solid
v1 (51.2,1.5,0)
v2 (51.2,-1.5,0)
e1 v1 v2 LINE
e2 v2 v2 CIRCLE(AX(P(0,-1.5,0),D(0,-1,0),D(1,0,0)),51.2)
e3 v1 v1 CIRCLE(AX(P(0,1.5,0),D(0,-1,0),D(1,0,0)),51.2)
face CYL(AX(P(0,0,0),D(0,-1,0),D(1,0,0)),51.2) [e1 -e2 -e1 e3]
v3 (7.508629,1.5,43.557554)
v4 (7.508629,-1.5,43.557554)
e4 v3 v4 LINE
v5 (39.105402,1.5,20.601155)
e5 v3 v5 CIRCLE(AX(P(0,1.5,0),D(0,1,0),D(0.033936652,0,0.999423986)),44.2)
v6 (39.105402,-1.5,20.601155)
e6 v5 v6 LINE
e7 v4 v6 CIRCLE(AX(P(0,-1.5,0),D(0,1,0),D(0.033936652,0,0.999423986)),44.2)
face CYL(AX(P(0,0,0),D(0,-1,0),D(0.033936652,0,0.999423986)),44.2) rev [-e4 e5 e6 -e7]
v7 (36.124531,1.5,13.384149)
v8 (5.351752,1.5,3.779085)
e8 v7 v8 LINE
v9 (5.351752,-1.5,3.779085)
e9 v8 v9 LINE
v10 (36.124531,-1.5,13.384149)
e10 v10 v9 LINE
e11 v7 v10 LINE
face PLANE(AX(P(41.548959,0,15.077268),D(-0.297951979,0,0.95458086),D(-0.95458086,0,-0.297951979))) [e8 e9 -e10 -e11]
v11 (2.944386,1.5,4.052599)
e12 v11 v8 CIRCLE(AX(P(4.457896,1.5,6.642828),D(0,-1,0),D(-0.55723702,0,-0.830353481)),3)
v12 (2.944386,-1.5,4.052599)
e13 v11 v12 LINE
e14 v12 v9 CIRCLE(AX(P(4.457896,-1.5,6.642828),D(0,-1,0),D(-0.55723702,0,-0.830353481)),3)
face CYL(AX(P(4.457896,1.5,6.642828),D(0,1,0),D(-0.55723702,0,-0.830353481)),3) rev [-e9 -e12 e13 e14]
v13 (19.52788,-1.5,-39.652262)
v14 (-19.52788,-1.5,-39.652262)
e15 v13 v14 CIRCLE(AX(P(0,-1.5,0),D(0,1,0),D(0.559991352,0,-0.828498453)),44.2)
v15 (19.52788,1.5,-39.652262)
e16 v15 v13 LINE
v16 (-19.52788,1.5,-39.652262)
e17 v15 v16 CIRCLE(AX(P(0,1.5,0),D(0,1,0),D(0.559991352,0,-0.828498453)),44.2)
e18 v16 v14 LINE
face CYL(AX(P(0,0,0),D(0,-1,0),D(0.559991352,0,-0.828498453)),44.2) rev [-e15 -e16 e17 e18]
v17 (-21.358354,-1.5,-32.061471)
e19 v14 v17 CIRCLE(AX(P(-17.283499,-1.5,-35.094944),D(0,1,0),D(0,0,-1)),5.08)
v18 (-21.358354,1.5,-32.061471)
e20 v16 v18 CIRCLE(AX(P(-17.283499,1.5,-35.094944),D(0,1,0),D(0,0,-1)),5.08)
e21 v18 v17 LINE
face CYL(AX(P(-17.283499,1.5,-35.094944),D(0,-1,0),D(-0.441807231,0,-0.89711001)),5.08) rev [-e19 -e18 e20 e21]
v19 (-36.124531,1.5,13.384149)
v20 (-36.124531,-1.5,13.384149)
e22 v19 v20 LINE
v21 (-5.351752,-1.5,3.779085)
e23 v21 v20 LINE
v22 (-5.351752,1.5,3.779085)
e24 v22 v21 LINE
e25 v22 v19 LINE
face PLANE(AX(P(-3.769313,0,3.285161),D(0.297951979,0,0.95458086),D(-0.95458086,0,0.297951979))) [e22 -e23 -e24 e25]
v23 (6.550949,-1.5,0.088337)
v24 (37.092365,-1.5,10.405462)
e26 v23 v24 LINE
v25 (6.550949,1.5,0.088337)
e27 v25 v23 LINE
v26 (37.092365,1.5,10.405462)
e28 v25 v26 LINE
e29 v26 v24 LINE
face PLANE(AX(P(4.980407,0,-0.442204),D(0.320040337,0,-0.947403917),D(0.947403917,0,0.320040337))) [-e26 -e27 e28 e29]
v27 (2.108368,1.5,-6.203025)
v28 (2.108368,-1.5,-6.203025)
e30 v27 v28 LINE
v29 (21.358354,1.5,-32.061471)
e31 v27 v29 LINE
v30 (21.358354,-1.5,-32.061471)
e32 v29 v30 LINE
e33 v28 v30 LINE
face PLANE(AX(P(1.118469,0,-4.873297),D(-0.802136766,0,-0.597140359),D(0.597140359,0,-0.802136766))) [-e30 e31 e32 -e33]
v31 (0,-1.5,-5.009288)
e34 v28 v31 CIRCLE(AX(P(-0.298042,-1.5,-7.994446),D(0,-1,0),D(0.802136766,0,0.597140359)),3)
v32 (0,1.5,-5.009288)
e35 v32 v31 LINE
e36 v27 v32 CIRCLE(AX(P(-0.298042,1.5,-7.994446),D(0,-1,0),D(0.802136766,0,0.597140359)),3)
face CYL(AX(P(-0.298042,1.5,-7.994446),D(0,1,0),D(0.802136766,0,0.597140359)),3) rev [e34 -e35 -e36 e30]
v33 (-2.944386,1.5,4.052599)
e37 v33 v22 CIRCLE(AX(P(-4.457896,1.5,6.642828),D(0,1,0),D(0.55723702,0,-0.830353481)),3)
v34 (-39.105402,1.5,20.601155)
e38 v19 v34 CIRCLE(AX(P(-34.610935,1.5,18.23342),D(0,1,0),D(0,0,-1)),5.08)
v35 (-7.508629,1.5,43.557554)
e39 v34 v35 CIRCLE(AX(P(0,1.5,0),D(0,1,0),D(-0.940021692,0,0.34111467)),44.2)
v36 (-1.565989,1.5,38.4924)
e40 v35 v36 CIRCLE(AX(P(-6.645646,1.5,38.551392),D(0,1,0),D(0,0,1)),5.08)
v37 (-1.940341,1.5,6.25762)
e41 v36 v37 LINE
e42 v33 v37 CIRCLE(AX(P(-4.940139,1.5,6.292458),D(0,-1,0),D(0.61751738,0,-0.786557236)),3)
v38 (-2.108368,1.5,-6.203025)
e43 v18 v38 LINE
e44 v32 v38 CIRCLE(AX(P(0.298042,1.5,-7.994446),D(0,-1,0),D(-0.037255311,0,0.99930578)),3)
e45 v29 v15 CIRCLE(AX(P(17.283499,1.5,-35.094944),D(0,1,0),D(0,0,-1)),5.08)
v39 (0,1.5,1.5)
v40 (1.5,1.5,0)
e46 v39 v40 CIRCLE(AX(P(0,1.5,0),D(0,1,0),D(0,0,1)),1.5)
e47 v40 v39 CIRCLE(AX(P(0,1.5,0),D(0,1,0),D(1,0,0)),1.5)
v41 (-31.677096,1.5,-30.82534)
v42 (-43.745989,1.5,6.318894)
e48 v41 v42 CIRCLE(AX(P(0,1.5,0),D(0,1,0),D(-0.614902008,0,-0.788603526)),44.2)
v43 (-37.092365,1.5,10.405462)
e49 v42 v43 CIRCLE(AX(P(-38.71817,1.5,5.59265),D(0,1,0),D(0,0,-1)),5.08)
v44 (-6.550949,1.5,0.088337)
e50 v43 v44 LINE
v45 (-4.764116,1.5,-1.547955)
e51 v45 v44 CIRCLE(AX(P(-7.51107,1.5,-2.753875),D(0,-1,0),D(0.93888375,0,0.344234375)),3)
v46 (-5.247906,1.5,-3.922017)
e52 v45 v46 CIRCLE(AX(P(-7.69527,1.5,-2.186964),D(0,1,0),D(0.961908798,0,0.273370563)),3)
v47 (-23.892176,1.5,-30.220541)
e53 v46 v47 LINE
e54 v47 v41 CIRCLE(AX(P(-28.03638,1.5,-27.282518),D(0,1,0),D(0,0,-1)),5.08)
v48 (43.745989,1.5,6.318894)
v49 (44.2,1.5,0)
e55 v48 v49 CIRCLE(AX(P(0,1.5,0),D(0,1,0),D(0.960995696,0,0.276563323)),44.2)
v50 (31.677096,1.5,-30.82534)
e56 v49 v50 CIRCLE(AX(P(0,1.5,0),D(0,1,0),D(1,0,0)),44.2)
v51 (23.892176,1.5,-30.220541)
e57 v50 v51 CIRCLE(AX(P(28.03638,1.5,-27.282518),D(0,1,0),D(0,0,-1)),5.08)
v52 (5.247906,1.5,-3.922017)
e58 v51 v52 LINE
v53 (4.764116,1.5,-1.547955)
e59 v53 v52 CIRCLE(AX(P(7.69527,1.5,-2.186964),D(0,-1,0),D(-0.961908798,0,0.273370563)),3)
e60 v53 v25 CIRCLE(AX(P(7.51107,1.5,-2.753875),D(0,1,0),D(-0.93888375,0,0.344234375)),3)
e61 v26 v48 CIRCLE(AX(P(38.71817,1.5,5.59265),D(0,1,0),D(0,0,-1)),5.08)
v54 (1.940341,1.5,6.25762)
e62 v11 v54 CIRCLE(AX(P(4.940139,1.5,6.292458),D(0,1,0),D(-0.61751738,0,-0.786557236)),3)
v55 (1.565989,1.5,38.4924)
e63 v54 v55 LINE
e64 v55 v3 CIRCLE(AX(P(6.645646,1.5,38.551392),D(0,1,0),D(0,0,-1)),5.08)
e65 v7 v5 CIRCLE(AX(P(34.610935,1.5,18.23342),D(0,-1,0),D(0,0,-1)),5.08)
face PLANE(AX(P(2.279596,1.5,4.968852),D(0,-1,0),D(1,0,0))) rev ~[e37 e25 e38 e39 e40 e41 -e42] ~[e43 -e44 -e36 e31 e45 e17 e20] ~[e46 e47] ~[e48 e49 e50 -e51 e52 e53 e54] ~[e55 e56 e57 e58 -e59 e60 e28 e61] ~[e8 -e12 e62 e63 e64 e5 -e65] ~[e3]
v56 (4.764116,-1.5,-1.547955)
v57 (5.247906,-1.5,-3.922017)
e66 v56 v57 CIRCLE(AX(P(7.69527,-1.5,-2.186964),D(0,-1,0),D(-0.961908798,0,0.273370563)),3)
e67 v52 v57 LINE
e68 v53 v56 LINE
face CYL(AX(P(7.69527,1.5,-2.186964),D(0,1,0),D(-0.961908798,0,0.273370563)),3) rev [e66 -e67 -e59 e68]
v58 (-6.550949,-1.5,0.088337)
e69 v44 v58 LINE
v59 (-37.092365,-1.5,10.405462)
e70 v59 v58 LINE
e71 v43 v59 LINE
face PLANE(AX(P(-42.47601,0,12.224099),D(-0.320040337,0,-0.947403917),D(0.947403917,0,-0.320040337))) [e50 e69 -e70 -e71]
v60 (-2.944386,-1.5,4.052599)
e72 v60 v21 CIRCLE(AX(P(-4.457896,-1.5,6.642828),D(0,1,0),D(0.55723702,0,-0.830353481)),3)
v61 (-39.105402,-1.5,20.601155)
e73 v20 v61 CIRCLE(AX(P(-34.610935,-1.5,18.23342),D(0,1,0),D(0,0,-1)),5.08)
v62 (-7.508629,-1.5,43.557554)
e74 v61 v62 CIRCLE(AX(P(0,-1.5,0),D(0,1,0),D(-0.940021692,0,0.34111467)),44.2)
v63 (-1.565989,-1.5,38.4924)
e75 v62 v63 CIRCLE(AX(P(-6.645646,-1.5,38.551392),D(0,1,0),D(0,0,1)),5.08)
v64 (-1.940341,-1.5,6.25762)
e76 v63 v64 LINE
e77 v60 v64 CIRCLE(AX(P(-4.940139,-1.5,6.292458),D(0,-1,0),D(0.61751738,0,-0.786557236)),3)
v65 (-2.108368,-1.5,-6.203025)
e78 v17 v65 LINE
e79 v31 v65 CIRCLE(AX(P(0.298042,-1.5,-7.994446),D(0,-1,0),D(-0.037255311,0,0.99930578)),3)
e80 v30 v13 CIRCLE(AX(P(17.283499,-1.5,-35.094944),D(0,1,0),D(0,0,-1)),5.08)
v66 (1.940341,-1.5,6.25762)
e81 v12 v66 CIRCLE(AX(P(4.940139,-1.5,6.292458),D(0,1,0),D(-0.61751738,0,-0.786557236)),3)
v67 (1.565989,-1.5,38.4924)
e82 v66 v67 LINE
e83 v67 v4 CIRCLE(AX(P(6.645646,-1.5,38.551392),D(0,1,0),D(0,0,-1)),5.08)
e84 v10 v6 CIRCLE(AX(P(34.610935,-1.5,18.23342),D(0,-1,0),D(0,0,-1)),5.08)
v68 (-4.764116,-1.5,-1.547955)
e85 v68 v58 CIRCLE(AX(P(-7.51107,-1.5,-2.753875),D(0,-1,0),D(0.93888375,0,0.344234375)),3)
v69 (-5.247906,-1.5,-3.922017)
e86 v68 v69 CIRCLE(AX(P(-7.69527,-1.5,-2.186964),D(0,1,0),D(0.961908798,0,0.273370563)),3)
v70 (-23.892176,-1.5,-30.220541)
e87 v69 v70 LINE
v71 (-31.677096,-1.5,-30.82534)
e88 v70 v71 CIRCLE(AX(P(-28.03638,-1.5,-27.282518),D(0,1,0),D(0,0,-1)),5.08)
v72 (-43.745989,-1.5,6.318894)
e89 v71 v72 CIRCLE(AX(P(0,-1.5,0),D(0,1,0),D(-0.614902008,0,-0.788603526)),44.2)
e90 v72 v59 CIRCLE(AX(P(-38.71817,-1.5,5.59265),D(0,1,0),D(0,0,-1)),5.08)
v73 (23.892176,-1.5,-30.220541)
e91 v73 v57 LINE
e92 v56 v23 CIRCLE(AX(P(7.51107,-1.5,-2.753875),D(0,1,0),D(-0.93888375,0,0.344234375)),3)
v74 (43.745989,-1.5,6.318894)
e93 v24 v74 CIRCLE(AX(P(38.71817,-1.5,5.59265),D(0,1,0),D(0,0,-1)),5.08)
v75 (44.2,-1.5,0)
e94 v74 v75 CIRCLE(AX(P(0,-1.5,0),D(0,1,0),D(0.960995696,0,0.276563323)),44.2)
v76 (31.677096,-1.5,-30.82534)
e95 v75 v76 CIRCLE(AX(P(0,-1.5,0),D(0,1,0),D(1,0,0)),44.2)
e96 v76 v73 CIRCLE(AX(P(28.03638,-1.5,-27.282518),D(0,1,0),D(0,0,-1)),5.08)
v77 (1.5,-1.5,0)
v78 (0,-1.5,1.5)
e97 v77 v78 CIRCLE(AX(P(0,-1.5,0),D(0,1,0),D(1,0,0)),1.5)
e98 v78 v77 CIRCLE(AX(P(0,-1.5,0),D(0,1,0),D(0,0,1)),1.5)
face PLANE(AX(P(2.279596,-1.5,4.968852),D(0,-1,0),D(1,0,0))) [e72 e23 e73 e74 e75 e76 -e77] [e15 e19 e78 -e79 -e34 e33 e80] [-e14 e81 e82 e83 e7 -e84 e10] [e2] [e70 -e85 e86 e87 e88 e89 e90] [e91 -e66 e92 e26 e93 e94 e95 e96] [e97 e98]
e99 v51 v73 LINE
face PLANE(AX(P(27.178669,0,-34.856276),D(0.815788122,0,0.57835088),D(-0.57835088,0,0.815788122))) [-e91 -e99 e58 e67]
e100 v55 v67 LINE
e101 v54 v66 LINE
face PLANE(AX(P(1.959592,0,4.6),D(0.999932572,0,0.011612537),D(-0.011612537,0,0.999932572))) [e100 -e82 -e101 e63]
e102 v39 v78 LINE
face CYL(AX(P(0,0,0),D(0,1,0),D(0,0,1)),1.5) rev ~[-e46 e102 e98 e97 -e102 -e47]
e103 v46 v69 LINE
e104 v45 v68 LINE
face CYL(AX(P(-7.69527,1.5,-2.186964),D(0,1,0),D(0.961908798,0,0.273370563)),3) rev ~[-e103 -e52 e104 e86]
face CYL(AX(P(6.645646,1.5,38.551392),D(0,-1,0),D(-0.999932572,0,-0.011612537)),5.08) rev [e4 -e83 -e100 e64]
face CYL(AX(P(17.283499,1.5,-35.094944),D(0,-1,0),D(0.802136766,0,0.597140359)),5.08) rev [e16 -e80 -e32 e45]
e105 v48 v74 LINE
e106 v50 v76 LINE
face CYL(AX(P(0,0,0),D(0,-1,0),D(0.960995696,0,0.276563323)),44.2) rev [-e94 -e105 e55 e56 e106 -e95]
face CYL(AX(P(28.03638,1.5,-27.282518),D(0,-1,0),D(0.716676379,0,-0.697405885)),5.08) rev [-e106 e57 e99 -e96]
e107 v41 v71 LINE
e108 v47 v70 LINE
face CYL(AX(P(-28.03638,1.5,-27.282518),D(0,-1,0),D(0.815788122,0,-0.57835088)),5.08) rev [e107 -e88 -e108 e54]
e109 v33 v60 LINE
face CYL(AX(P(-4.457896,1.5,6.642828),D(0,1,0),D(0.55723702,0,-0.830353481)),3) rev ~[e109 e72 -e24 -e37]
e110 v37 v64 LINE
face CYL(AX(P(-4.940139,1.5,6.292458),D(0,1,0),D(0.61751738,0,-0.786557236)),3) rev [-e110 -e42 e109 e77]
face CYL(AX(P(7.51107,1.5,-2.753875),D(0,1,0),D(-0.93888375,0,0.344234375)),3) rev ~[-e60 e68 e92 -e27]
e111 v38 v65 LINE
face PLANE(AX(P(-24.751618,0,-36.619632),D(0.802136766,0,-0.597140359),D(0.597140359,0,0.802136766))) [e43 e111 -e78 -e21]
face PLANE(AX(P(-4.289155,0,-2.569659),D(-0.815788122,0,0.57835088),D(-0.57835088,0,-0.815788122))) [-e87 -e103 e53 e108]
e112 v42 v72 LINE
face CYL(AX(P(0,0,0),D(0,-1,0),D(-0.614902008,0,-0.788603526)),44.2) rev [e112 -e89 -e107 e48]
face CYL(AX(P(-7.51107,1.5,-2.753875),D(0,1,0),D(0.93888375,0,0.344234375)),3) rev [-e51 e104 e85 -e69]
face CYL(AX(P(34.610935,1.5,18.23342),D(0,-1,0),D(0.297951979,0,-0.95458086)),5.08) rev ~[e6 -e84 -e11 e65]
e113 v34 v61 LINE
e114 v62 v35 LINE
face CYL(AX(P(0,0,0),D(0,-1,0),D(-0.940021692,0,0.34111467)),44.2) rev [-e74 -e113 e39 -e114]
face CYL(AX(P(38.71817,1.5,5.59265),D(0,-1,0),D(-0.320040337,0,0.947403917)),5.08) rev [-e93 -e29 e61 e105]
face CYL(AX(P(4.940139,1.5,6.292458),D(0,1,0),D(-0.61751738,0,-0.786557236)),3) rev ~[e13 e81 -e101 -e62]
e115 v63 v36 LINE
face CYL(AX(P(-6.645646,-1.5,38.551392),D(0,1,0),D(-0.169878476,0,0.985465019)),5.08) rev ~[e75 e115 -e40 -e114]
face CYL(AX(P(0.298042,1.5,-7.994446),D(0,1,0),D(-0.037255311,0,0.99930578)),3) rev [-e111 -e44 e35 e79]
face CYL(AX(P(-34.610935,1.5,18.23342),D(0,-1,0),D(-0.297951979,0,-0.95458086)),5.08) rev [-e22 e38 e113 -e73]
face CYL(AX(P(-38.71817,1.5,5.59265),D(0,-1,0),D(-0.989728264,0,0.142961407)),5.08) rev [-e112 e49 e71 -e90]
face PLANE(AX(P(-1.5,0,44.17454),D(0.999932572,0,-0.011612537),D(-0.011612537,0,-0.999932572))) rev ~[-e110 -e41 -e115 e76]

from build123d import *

# Parameters (mm, degrees)
F0_R        = 51.2
F1_DEPTH    = 1.5
F2_T1_DEPTH = 3
F3_R        = 5.08


# Not quite as in the source:
# - a fillet or chamfer that OpenCascade refuses, or shapes differently, is made with other operations: its cross-section is extruded or revolved along the edge and cut away or added


with BuildPart() as f1:
    # F0 (on Front) → F1 (new body, symmetric)
    with BuildSketch(Plane.XZ):
        Circle(F0_R)
        with BuildLine():
            ThreePointArc((1.5, 44.1745401787), (25.9801081513, 35.7585511514), (41.5489587997, 15.0772684084))
            ThreePointArc((41.5489587997, 15.0772684084), (42.0366980202, 13.6585511514), (42.4760097829, 12.2240988595))
            ThreePointArc((42.4760097829, 12.2240988595), (43.7668803572, 6.1725346333), (44.2, 0))
            ThreePointArc((44.2, 0), (39.7173586616, -19.3951391062), (27.1786687354, -34.8562758448))
            ThreePointArc((27.1786687354, -34.8562758448), (25.9801081513, -35.7585511514), (24.7516177523, -36.6196316017))
            ThreePointArc((24.7516177523, -36.6196316017), (0, -44.2), (-24.7516177523, -36.6196316017))
            ThreePointArc((-24.7516177523, -36.6196316017), (-25.9801081513, -35.7585511514), (-27.1786687354, -34.8562758448))
            ThreePointArc((-27.1786687354, -34.8562758448), (-42.0366980202, -13.6585511514), (-42.4760097829, 12.2240988595))
            ThreePointArc((-42.4760097829, 12.2240988595), (-42.0366980202, 13.6585511514), (-41.5489587997, 15.0772684084))
            ThreePointArc((-41.5489587997, 15.0772684084), (-25.9801081513, 35.7585511514), (-1.5, 44.1745401787))
            ThreePointArc((-1.5, 44.1745401787), (0, 44.2), (1.5, 44.1745401787))
        make_face(mode=Mode.SUBTRACT)
        with BuildLine():
            Line((-24.7516177523, -36.6196316017), (-1.118469097, -4.8732973313))
            ThreePointArc((-1.118469097, -4.8732973313), (-2.9389262615, -4.0450849719), (-4.2891552241, -2.569659017))
            Line((-4.2891552241, -2.569659017), (-27.1786687354, -34.8562758448))
            ThreePointArc((-27.1786687354, -34.8562758448), (-25.9801081513, -35.7585511514), (-24.7516177523, -36.6196316017))
        make_face()
        with BuildLine():
            ThreePointArc((-4.9804071414, -0.4422043711), (-4.7552825815, 1.5450849719), (-3.7693128085, 3.2851607193))
            Line((-3.7693128085, 3.2851607193), (-41.5489587997, 15.0772684084))
            ThreePointArc((-41.5489587997, 15.0772684084), (-42.0366980202, 13.6585511514), (-42.4760097829, 12.2240988595))
            Line((-42.4760097829, 12.2240988595), (-4.9804071414, -0.4422043711))
        make_face()
        with BuildLine():
            ThreePointArc((-1.9595917942, 4.6), (0, 5), (1.9595917942, 4.6))
            Line((1.9595917942, 4.6), (1.5, 44.1745401787))
            ThreePointArc((1.5, 44.1745401787), (0, 44.2), (-1.5, 44.1745401787))
            Line((-1.5, 44.1745401787), (-1.9595917942, 4.6))
        make_face()
        with BuildLine():
            ThreePointArc((3.7693128085, 3.2851607193), (4.6822304537, 1.7540575757), (5, 0))
            ThreePointArc((5, 0), (4.9950993837, -0.2213191055), (4.9804071414, -0.4422043711))
            Line((4.9804071414, -0.4422043711), (42.4760097829, 12.2240988595))
            ThreePointArc((42.4760097829, 12.2240988595), (42.0366980202, 13.6585511514), (41.5489587997, 15.0772684084))
            Line((41.5489587997, 15.0772684084), (3.7693128085, 3.2851607193))
        make_face()
        with BuildLine():
            Line((27.1786687354, -34.8562758448), (4.2891552241, -2.569659017))
            ThreePointArc((4.2891552241, -2.569659017), (2.9389262615, -4.0450849719), (1.118469097, -4.8732973313))
            Line((1.118469097, -4.8732973313), (24.7516177523, -36.6196316017))
            ThreePointArc((24.7516177523, -36.6196316017), (25.9801081513, -35.7585511514), (27.1786687354, -34.8562758448))
        make_face()
        with BuildLine():
            ThreePointArc((4.9804071414, -0.4422043711), (4.9950993837, -0.2213191055), (5, 0))
            ThreePointArc((5, 0), (4.6822304537, 1.7540575757), (3.7693128085, 3.2851607193))
            ThreePointArc((3.7693128085, 3.2851607193), (2.9389262615, 4.0450849719), (1.9595917942, 4.6))
            ThreePointArc((1.9595917942, 4.6), (0, 5), (-1.9595917942, 4.6))
            ThreePointArc((-1.9595917942, 4.6), (-2.9389262615, 4.0450849719), (-3.7693128085, 3.2851607193))
            ThreePointArc((-3.7693128085, 3.2851607193), (-4.7552825815, 1.5450849719), (-4.9804071414, -0.4422043711))
            ThreePointArc((-4.9804071414, -0.4422043711), (-4.7552825815, -1.5450849719), (-4.2891552241, -2.569659017))
            ThreePointArc((-4.2891552241, -2.569659017), (-2.9389262615, -4.0450849719), (-1.118469097, -4.8732973313))
            ThreePointArc((-1.118469097, -4.8732973313), (0, -5), (1.118469097, -4.8732973313))
            ThreePointArc((1.118469097, -4.8732973313), (2.9389262615, -4.0450849719), (4.2891552241, -2.569659017))
            ThreePointArc((4.2891552241, -2.569659017), (4.7552825815, -1.5450849719), (4.9804071414, -0.4422043711))
        make_face()
        with BuildLine():
            ThreePointArc((0, 1.5), (1.0606601718, 1.0606601718), (1.5, 0))
            ThreePointArc((1.5, 0), (-1.0606601718, -1.0606601718), (0, 1.5))
        make_face(mode=Mode.SUBTRACT)
    extrude(amount=F1_DEPTH, both=True)

    # F2: fillet of radius 3 on 10 edges, made by hand

    # F2_s2 → F2_t1 (join)
    with BuildSketch(Plane.XZ.offset(-1.5)):
        with BuildLine():
            ThreePointArc((3.0875868977, 3.9327861815), (2.2498717307, 4.9648804635), (1.9403413197, 6.2576202799))
            Line((1.9403413197, 6.2576202799), (1.9595917942, 4.6))
            ThreePointArc((1.9595917942, 4.6), (2.5455444913, 4.303510572), (3.0875868977, 3.9327861815))
        make_face()
        with BuildLine():
            ThreePointArc((2.7861851021, 4.151767404), (4.0266333175, 3.6739876086), (5.351752101, 3.7790852667))
            Line((5.351752101, 3.7790852667), (3.7693128085, 3.2851607193))
            ThreePointArc((3.7693128085, 3.2851607193), (3.3062652647, 3.7508145781), (2.7861851021, 4.151767404))
        make_face()
        with BuildLine():
            ThreePointArc((-2.7861851021, 4.151767404), (-4.0266333175, 3.6739876086), (-5.351752101, 3.7790852667))
            Line((-5.351752101, 3.7790852667), (-3.7693128085, 3.2851607193))
            ThreePointArc((-3.7693128085, 3.2851607193), (-3.3062652647, 3.7508145781), (-2.7861851021, 4.151767404))
        make_face()
        with BuildLine():
            ThreePointArc((-3.0875868977, 3.9327861815), (-2.2498717307, 4.9648804635), (-1.9403413197, 6.2576202799))
            Line((-1.9403413197, 6.2576202799), (-1.9595917942, 4.6))
            ThreePointArc((-1.9595917942, 4.6), (-2.5455444913, 4.303510572), (-3.0875868977, 3.9327861815))
        make_face()
        with BuildLine():
            ThreePointArc((-4.6944187481, -1.7211718734), (-5.4171305174, -0.605522732), (-6.5509489863, 0.0883367549))
            Line((-6.5509489863, 0.0883367549), (-4.9804071414, -0.4422043711))
            ThreePointArc((-4.9804071414, -0.4422043711), (-4.8794982801, -1.0910987737), (-4.6944187481, -1.7211718734))
        make_face()
        with BuildLine():
            ThreePointArc((-4.8095439897, -1.3668528124), (-4.7384679811, -2.6942312472), (-5.2479060175, -3.9220171386))
            Line((-5.2479060175, -3.9220171386), (-4.2891552241, -2.569659017))
            ThreePointArc((-4.2891552241, -2.569659017), (-4.5889288007, -1.9853796772), (-4.8095439897, -1.3668528124))
        make_face()
        with BuildLine():
            ThreePointArc((4.6944187481, -1.7211718734), (5.4171305174, -0.605522732), (6.5509489863, 0.0883367549))
            Line((6.5509489863, 0.0883367549), (4.9804071414, -0.4422043711))
            ThreePointArc((4.9804071414, -0.4422043711), (4.8794982801, -1.0910987737), (4.6944187481, -1.7211718734))
        make_face()
        with BuildLine():
            ThreePointArc((4.8095439897, -1.3668528124), (4.7384679811, -2.6942312472), (5.2479060175, -3.9220171386))
            Line((5.2479060175, -3.9220171386), (4.2891552241, -2.569659017))
            ThreePointArc((4.2891552241, -2.569659017), (4.5889288007, -1.9853796772), (4.8095439897, -1.3668528124))
        make_face()
        with BuildLine():
            ThreePointArc((0.186276554, -4.9965288997), (-1.0980990506, -5.3391140929), (-2.1083678125, -6.2030251629))
            Line((-2.1083678125, -6.2030251629), (-1.118469097, -4.8732973313))
            ThreePointArc((-1.118469097, -4.8732973313), (-0.4701512939, -4.9778466992), (0.186276554, -4.9965288997))
        make_face()
        with BuildLine():
            ThreePointArc((2.1083678125, -6.2030251629), (1.0980990506, -5.3391140929), (-0.186276554, -4.9965288997))
            ThreePointArc((-0.186276554, -4.9965288997), (0.4701512939, -4.9778466992), (1.118469097, -4.8732973313))
            Line((1.118469097, -4.8732973313), (2.1083678125, -6.2030251629))
        make_face()
    extrude(amount=F2_T1_DEPTH)

    # F3
    f3_edges = [f1.edges().sort_by_distance(p)[0] for p in [
        (-42.47601, 0, 12.224099),
        (42.47601, 0, 12.224099),
        (-1.5, 0, 44.17454),
        (24.751618, 0, -36.619632),
        (27.178669, 0, -34.856276),
        (41.548959, 0, 15.077268),
        (1.5, 0, 44.17454),
        (-41.548959, 0, 15.077268),
        (-27.178669, 0, -34.856276),
        (-24.751618, 0, -36.619632),
    ]]
    fillet(f3_edges, radius=F3_R)


solid = f1.part
